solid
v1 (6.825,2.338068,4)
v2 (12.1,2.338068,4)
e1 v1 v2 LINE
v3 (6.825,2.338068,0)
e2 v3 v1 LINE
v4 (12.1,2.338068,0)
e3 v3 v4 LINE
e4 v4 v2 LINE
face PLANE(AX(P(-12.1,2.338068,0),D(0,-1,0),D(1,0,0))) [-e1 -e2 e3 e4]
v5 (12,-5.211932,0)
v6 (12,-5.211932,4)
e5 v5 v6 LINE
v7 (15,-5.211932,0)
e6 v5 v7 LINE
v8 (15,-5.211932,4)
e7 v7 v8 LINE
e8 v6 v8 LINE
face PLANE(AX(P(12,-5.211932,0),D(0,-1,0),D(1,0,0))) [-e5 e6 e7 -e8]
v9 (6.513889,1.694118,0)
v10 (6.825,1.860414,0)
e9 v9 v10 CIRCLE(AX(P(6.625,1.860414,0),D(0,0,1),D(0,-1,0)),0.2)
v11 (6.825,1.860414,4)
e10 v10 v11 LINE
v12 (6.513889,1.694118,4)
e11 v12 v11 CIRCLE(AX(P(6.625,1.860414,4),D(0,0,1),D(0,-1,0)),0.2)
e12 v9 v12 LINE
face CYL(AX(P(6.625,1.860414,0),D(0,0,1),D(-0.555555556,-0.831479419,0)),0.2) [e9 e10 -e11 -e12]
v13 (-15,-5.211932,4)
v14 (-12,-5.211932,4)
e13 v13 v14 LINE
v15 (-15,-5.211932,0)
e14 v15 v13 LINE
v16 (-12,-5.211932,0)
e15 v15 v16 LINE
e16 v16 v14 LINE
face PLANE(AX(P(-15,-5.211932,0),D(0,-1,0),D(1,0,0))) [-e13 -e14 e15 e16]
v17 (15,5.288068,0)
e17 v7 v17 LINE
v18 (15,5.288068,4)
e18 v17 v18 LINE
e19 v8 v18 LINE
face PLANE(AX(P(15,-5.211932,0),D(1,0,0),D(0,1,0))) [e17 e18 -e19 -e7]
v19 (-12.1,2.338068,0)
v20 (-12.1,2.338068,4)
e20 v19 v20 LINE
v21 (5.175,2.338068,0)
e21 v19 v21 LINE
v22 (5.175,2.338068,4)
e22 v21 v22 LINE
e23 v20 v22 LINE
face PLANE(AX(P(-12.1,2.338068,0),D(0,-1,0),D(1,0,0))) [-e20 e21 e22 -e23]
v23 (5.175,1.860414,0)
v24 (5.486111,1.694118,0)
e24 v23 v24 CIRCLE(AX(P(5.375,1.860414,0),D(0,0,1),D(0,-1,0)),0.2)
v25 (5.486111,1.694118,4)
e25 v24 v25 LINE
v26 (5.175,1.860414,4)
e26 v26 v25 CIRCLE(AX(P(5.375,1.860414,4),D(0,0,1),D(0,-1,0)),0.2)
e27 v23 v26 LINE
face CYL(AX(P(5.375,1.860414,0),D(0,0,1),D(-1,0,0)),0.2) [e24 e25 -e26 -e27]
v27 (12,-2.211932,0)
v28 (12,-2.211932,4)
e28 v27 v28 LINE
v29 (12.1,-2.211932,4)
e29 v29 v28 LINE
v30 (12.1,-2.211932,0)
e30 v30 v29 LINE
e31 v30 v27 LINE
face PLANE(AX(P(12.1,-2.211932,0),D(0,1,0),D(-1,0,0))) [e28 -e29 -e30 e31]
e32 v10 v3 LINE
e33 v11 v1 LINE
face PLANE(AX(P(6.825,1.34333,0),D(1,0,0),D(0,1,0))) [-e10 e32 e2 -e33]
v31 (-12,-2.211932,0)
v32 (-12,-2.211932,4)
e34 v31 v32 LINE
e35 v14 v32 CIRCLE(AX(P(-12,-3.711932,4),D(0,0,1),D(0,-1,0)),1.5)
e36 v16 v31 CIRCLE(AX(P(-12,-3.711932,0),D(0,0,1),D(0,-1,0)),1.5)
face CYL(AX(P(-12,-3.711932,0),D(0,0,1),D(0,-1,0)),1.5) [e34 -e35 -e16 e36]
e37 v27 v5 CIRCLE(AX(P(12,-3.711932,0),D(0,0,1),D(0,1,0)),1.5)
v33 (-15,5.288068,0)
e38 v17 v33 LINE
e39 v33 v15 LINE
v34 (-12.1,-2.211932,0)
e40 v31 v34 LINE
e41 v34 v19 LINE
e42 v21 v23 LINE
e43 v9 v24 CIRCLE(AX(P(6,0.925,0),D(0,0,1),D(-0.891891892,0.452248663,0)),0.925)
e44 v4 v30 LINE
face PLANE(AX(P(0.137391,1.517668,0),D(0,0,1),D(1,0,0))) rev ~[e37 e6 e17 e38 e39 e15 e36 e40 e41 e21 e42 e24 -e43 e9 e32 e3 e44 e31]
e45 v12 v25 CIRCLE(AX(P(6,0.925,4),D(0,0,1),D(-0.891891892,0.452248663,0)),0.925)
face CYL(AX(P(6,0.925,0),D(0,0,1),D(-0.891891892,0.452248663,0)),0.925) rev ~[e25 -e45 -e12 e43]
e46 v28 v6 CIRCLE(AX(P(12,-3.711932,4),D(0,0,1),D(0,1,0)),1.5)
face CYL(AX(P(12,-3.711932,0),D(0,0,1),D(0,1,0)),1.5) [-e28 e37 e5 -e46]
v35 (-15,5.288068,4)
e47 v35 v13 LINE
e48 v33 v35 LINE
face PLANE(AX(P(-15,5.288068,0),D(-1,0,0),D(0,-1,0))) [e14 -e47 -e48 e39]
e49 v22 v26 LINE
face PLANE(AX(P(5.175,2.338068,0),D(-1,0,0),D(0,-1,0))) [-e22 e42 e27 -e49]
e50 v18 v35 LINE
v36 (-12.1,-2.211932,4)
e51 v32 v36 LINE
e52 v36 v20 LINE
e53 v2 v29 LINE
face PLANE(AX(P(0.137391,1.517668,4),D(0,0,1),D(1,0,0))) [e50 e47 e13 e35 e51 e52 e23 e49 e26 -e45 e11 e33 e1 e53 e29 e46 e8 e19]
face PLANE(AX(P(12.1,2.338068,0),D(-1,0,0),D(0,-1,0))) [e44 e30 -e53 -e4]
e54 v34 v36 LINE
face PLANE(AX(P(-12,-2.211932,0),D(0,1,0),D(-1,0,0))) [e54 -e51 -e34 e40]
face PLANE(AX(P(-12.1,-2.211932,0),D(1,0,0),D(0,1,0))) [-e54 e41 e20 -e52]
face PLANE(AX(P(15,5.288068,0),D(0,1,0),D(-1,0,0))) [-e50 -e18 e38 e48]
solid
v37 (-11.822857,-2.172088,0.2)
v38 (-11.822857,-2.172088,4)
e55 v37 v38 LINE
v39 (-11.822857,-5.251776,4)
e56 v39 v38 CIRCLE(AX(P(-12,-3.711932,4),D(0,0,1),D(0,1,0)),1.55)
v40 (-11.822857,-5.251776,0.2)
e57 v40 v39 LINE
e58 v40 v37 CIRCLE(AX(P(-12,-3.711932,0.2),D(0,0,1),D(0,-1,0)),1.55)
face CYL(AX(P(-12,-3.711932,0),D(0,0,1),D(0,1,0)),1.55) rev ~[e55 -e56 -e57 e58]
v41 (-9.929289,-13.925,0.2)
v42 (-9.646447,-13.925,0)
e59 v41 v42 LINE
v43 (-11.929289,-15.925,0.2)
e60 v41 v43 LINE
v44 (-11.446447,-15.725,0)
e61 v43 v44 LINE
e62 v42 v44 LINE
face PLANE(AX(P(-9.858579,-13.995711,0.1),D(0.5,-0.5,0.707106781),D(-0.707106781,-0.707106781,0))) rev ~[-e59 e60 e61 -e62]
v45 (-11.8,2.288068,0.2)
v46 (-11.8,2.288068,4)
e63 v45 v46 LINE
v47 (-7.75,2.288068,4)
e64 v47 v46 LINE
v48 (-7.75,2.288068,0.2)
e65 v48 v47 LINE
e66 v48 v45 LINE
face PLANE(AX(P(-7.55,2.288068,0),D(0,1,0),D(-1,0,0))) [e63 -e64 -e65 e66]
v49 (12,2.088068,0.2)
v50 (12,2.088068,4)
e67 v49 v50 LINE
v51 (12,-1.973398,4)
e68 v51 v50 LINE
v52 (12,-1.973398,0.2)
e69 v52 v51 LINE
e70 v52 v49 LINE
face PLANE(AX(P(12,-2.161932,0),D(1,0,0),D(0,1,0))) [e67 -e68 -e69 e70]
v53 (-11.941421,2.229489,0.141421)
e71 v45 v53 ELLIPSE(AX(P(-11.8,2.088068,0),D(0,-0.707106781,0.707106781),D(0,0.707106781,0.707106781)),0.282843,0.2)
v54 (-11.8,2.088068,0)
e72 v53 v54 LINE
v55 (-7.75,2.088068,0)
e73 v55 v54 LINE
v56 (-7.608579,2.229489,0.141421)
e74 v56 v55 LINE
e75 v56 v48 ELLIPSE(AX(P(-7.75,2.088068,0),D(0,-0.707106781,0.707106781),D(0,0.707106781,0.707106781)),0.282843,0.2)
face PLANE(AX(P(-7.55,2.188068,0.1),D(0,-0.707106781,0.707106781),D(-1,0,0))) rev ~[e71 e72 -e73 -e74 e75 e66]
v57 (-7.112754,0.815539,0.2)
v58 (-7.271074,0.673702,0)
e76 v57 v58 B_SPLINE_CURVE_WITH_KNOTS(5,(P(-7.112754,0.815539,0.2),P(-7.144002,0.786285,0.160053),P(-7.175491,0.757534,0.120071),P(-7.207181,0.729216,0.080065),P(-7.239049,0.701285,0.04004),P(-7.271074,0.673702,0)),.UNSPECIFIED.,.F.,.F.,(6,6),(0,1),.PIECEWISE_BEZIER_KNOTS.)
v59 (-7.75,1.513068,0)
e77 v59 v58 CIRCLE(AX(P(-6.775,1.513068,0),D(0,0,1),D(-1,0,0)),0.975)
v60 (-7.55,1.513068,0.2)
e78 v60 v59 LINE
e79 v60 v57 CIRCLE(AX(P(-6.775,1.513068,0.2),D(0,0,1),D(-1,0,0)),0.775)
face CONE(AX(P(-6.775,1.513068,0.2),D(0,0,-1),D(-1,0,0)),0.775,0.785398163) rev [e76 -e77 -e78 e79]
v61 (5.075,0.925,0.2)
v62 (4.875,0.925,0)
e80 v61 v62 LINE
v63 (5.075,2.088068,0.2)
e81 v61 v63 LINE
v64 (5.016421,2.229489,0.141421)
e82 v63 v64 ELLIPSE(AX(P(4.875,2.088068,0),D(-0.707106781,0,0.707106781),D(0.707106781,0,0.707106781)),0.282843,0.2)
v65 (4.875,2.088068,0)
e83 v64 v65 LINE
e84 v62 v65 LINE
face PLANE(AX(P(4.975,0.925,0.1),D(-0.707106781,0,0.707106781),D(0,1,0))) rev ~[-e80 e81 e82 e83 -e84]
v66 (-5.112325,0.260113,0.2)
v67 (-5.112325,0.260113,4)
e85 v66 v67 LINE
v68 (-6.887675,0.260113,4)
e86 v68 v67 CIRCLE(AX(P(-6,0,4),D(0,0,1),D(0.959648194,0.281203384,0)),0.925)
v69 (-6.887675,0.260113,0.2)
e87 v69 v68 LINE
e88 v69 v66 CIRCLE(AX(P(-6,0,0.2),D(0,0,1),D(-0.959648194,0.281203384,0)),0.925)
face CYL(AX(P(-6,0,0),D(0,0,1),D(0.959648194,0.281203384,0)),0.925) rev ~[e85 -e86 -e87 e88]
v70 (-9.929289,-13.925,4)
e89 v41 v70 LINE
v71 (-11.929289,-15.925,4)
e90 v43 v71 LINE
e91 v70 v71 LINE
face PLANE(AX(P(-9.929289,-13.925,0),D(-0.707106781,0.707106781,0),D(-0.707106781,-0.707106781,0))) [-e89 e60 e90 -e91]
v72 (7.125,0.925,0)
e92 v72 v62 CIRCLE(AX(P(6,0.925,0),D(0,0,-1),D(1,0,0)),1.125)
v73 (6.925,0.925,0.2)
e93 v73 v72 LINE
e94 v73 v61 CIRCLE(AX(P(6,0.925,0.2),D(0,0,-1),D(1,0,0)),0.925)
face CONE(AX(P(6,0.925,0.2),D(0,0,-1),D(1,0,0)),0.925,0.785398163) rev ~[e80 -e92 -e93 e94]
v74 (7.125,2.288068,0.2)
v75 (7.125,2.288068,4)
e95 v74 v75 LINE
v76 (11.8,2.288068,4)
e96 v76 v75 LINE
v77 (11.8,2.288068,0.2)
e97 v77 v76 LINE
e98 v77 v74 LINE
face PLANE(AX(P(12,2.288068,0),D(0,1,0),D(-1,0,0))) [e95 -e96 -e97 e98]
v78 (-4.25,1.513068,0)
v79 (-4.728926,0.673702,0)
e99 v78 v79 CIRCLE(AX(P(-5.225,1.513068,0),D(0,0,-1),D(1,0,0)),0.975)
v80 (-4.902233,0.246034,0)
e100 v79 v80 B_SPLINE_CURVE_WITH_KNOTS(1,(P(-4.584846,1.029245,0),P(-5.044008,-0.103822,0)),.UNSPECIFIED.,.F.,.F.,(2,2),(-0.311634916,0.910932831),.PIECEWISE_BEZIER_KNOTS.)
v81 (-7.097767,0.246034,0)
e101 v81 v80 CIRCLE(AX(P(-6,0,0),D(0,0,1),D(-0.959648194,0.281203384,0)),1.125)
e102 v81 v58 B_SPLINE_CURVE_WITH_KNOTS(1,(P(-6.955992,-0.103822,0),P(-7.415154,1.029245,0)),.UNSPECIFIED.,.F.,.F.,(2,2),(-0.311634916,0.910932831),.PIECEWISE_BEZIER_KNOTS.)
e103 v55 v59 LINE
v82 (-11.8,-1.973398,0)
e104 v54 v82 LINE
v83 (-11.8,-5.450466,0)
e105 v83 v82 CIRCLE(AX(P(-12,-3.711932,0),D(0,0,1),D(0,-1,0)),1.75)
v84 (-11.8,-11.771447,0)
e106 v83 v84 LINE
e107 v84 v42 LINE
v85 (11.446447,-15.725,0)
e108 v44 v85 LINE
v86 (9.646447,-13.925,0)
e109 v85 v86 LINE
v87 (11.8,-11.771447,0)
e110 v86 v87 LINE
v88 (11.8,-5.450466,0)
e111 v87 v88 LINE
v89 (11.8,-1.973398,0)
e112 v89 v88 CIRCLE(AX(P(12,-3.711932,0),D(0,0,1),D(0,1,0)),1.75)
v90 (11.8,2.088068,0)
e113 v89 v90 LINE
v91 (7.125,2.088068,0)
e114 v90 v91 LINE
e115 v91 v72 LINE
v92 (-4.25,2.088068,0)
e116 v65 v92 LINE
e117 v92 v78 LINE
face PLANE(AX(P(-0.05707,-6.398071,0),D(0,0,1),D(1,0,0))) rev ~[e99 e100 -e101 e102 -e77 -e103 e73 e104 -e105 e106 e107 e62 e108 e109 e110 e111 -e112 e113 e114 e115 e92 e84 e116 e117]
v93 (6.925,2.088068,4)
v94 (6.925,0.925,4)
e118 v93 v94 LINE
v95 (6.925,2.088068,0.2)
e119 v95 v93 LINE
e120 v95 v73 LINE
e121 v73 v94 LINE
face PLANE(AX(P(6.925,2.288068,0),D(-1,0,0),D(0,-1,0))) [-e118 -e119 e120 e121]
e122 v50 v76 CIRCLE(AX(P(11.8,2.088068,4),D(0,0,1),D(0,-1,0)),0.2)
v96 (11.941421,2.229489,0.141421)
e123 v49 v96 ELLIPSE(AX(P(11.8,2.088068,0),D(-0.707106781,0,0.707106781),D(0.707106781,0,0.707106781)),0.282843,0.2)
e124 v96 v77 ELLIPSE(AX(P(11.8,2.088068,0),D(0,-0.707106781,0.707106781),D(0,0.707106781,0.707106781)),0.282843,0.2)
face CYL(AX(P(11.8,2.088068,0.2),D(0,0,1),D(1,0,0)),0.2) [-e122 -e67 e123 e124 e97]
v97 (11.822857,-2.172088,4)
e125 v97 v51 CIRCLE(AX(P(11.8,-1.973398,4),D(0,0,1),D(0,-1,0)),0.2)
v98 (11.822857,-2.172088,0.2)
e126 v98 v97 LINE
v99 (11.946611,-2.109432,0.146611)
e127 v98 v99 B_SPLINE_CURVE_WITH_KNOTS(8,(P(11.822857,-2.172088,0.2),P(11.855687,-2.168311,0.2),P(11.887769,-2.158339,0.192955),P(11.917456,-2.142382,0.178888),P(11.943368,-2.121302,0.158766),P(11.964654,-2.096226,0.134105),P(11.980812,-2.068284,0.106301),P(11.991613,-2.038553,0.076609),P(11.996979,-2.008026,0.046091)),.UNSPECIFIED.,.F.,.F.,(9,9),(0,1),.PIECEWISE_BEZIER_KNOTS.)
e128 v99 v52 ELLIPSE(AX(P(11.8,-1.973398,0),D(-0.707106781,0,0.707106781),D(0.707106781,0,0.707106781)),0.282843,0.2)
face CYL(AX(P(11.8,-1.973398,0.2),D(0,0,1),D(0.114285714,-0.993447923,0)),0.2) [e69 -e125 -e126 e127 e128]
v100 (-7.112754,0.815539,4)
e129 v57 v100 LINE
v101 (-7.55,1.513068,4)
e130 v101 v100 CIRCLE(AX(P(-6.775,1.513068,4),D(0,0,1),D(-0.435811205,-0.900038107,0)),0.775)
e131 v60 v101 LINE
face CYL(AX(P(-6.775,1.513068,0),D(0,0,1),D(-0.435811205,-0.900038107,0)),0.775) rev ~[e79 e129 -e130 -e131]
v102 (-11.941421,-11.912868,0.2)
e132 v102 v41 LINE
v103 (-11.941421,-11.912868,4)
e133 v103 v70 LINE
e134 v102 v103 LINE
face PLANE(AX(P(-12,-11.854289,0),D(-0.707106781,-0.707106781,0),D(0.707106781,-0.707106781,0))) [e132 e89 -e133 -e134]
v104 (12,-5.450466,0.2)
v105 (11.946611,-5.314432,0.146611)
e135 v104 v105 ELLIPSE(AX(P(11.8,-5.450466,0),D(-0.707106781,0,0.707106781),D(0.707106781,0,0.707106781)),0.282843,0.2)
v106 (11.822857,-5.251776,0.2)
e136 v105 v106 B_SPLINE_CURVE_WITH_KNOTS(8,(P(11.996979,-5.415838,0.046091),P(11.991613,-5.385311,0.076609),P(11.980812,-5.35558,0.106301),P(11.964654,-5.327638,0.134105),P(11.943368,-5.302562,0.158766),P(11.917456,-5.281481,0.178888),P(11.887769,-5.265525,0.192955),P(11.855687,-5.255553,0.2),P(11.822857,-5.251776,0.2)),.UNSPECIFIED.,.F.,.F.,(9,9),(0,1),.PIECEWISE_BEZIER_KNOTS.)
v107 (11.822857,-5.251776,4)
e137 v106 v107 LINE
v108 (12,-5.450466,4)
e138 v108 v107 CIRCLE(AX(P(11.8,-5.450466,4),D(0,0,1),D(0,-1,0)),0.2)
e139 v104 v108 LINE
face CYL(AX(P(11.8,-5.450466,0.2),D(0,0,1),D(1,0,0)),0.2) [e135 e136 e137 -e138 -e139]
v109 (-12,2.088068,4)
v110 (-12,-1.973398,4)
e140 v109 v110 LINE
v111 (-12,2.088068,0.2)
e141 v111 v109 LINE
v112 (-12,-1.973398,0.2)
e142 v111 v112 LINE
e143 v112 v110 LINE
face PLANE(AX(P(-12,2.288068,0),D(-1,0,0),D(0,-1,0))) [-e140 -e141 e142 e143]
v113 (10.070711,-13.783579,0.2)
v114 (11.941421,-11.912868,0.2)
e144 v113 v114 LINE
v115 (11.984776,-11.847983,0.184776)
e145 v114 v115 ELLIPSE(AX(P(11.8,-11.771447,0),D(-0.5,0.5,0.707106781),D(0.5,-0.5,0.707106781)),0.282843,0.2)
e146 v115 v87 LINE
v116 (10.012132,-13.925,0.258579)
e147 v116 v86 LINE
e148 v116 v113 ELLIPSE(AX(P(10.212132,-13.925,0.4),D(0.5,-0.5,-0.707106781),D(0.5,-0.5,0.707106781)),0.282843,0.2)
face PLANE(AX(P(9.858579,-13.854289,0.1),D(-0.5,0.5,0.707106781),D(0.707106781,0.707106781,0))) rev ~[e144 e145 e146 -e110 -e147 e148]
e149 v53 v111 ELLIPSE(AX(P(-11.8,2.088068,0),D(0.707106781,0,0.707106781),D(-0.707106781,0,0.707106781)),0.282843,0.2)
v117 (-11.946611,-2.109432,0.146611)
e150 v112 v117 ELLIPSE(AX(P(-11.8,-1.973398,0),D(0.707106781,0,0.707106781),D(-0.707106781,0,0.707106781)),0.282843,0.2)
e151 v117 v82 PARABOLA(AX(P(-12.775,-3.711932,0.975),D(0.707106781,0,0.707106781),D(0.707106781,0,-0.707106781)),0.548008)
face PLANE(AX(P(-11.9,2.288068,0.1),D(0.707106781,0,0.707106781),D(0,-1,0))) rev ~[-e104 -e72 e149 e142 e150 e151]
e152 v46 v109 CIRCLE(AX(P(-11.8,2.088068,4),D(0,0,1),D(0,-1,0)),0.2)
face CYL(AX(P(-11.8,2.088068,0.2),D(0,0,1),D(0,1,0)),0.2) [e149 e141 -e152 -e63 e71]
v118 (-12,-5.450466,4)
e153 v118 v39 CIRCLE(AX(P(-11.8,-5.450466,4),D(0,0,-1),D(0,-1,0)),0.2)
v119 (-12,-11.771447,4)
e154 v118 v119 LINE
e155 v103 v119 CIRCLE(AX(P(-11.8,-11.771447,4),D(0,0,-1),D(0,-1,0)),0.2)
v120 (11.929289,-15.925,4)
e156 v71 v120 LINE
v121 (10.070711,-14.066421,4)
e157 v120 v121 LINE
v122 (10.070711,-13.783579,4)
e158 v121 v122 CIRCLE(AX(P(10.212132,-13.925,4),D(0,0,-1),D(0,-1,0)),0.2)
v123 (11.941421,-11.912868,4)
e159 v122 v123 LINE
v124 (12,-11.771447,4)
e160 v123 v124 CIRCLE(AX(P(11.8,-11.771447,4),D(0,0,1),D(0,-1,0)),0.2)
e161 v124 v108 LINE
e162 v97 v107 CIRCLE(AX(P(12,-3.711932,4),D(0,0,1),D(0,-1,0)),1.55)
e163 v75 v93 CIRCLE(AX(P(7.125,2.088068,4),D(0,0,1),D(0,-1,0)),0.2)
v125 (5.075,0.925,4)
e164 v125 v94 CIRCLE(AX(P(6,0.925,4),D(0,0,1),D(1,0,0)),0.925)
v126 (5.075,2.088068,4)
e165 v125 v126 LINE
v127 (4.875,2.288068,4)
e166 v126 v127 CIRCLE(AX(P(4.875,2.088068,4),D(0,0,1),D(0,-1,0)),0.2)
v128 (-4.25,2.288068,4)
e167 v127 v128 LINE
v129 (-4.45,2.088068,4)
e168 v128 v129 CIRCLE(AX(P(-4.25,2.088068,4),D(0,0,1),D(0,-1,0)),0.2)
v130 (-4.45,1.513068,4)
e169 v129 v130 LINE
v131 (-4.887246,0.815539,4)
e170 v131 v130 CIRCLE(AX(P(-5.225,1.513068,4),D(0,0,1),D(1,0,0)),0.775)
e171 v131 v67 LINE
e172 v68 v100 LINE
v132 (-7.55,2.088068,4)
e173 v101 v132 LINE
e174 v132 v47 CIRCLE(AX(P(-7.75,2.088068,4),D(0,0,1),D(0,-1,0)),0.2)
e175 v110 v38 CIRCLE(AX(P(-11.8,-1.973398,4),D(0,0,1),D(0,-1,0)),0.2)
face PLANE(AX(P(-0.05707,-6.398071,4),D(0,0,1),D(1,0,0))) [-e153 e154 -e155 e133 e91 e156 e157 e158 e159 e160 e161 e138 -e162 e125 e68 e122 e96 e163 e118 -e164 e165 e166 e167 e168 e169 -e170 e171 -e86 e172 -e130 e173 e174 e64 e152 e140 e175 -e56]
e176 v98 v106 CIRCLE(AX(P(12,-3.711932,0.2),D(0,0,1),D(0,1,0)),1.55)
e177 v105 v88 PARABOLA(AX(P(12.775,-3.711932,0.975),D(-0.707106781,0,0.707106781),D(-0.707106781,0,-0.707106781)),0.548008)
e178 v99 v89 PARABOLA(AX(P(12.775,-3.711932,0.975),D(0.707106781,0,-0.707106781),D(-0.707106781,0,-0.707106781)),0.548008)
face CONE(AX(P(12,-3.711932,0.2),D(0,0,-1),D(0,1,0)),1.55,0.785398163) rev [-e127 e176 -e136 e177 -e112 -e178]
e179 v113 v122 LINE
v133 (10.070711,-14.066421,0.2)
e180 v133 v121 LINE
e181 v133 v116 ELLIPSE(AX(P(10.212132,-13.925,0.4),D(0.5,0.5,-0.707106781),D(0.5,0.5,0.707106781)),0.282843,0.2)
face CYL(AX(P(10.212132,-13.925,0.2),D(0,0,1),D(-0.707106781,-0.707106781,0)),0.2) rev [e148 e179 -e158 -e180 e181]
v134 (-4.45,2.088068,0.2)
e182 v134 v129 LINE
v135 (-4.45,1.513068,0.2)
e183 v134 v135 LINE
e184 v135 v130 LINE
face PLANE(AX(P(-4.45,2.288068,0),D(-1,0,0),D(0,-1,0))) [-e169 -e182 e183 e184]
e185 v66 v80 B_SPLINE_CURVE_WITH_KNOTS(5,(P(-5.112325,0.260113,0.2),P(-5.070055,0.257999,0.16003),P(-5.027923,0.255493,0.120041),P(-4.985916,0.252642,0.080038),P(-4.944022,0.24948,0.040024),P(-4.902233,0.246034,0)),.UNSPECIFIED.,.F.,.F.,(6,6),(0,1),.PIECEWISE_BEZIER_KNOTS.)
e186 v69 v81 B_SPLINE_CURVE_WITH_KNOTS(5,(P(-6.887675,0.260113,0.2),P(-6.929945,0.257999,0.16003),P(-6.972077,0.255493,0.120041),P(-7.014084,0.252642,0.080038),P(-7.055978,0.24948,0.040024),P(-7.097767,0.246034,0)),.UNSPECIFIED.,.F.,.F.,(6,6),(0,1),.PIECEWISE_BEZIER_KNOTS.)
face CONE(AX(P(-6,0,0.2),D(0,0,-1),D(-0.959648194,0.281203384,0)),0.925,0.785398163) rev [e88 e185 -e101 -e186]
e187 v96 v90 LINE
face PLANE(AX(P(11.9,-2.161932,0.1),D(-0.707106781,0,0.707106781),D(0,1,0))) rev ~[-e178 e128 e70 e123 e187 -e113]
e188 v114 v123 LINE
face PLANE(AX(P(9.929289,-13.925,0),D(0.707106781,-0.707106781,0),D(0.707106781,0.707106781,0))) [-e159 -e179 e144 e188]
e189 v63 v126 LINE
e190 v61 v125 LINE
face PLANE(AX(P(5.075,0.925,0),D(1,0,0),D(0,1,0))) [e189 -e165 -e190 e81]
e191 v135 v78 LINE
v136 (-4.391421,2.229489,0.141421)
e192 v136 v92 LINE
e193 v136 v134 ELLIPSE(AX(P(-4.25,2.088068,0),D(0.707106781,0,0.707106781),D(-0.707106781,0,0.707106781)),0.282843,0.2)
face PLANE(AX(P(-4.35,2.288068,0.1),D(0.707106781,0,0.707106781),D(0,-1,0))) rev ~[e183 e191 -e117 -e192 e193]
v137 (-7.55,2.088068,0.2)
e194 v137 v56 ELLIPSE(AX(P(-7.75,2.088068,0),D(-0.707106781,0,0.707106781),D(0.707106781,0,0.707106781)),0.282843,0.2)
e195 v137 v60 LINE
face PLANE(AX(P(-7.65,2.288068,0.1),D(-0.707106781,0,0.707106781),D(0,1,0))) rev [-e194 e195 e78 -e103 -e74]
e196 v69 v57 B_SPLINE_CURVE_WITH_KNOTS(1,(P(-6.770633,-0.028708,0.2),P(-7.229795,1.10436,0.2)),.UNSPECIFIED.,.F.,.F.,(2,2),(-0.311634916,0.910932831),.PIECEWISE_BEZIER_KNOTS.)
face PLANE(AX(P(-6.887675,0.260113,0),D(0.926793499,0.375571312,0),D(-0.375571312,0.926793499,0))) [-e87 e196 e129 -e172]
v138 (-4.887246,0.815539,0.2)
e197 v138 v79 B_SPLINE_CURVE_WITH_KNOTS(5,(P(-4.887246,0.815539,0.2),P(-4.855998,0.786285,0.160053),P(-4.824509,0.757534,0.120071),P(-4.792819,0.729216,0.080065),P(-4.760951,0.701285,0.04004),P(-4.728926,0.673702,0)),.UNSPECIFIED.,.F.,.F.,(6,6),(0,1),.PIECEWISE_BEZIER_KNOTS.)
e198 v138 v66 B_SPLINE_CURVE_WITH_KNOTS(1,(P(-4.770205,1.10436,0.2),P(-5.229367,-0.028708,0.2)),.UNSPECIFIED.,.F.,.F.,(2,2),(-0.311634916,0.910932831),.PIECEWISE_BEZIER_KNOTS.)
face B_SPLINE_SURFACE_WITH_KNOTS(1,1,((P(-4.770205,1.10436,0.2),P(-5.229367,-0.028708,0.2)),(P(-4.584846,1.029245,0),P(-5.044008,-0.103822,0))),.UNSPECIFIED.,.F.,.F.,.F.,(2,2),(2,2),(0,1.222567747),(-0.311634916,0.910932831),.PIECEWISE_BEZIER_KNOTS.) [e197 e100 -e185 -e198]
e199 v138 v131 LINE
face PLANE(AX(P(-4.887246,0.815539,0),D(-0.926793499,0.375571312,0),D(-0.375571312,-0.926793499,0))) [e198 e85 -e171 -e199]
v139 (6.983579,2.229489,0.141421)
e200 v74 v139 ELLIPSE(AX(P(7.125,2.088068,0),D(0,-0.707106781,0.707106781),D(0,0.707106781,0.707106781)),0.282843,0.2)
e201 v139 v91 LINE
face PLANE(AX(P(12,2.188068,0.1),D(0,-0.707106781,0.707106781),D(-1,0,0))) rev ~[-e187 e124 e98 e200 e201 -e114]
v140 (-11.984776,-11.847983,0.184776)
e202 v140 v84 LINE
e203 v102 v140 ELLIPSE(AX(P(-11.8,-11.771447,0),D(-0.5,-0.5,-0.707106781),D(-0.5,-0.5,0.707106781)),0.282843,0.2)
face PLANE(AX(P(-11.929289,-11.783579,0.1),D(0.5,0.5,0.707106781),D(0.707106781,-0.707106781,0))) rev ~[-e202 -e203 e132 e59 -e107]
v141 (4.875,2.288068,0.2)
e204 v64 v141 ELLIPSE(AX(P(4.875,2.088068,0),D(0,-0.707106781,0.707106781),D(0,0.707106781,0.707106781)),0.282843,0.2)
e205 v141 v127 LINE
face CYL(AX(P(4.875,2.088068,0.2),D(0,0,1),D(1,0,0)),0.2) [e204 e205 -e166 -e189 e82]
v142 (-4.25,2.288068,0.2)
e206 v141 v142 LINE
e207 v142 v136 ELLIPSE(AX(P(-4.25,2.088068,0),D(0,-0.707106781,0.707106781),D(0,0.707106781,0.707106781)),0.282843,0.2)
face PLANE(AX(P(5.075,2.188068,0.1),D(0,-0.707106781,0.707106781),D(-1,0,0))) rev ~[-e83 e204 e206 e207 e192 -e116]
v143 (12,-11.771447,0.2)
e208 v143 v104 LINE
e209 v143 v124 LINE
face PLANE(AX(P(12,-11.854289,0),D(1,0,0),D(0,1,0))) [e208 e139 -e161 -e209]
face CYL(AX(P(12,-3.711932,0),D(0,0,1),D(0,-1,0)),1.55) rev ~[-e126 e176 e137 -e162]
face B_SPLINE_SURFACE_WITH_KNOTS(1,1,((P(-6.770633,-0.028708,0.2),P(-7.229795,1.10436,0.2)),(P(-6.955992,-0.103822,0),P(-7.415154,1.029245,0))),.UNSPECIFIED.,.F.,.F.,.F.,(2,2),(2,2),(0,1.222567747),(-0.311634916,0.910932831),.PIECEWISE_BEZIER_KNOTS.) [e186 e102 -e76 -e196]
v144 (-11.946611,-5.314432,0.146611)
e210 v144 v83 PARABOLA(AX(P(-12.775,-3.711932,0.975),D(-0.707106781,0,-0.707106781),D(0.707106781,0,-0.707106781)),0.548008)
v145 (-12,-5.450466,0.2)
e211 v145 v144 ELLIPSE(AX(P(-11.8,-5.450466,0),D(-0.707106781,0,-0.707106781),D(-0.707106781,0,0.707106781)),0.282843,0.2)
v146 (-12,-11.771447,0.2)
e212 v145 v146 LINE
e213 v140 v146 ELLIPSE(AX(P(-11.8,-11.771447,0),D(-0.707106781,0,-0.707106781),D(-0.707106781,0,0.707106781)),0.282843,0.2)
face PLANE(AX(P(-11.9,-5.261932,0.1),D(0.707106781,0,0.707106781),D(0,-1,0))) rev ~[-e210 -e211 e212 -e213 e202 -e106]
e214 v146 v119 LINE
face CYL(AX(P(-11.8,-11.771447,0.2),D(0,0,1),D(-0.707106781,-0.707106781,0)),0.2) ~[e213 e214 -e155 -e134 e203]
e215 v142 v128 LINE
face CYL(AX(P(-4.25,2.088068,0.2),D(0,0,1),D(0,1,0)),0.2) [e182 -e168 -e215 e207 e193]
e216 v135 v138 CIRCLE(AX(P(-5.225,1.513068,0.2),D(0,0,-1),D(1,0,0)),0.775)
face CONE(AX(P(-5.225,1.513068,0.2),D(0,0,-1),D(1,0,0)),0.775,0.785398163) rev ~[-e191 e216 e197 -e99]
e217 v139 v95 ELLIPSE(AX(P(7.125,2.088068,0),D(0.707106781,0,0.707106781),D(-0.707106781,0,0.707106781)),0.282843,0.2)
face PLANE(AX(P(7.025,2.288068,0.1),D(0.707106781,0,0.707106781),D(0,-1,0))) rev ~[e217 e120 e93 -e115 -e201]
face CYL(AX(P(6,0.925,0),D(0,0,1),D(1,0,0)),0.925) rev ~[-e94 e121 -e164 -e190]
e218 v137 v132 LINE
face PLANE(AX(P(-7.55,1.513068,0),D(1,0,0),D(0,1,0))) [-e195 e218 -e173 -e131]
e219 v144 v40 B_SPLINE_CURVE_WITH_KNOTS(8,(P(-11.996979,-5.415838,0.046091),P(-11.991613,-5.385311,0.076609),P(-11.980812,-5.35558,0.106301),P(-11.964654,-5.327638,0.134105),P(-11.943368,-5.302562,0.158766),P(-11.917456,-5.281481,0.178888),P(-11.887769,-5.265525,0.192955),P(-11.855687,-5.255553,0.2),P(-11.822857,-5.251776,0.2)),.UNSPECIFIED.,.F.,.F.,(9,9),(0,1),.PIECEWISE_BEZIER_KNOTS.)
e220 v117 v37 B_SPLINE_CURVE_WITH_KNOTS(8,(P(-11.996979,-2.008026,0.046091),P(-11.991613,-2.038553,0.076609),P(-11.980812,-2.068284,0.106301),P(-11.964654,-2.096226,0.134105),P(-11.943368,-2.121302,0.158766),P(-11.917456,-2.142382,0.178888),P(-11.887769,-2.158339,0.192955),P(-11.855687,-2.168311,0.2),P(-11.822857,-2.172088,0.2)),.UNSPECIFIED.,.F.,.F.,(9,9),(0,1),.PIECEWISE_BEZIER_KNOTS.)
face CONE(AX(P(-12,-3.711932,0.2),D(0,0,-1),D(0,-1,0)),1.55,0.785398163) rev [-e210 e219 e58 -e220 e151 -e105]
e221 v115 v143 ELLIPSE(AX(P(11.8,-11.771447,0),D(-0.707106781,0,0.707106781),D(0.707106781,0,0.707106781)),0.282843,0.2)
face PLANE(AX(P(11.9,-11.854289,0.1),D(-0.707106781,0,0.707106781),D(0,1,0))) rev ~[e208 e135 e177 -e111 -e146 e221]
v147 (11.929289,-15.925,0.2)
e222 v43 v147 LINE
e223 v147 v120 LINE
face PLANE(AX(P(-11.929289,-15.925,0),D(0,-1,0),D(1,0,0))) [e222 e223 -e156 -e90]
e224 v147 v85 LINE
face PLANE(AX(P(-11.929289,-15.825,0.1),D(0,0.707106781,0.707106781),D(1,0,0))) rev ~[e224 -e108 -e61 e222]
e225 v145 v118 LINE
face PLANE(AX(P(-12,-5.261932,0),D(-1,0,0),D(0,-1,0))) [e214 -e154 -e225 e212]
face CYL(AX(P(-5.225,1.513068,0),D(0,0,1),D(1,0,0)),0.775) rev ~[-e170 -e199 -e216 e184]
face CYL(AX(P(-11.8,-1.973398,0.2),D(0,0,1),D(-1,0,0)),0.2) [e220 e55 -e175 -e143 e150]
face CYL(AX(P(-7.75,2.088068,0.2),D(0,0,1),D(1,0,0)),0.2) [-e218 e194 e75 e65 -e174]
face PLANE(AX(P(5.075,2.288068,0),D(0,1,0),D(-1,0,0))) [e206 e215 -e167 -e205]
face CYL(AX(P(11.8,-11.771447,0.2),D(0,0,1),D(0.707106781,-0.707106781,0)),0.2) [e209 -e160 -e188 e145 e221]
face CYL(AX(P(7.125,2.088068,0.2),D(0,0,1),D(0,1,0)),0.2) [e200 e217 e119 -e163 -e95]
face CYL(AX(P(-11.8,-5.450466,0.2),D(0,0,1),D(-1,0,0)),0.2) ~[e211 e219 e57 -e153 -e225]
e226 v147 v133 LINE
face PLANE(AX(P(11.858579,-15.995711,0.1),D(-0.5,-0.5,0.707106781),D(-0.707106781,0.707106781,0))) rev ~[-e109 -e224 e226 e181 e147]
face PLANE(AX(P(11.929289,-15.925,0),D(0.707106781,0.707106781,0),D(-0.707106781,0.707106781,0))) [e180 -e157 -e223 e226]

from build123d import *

# Parameters (mm, degrees)
F3_SIZE = 0.2
F6_R    = 0.2
F6_2_R  = 0.2


with BuildPart() as f2:
    # F2: sweep along a path in F1
    with BuildLine(Plane.XZ) as f2_path:
        Line((0, 0), (0, 4))
    # F0 (on Top) → F2 (sweep)
    with BuildSketch(Plane.XY):
        with BuildLine():
            Line((-9.9292893219, -13.925), (-11.9292893219, -15.925))
            Line((-11.9292893219, -15.925), (11.9292893219, -15.925))
            Line((11.9292893219, -15.925), (9.9292893219, -13.925))
            Line((9.9292893219, -13.925), (12, -11.8542893219))
            Line((12, -11.8542893219), (12, -5.2619319249))
            ThreePointArc((12, -5.2619319249), (10.45, -3.7119319249), (12, -2.1619319249))
            Line((12, -2.1619319249), (12, 2.2880680751))
            Line((12, 2.2880680751), (6.925, 2.2880680751))
            Line((6.925, 2.2880680751), (6.925, 0.925))
            ThreePointArc((6.925, 0.925), (6, 0), (5.075, 0.925))
            Line((5.075, 0.925), (5.075, 2.2880680751))
            Line((5.075, 2.2880680751), (-4.45, 2.2880680751))
            Line((-4.45, 2.2880680751), (-4.45, 1.5130680751))
            ThreePointArc((-4.45, 1.5130680751), (-4.5683478452, 1.1014457391), (-4.8872463162, 0.8155385424))
            Line((-4.8872463162, 0.8155385424), (-5.1123254204, 0.2601131305))
            ThreePointArc((-5.1123254204, 0.2601131305), (-6, -0.925), (-6.8876745796, 0.2601131305))
            Line((-6.8876745796, 0.2601131305), (-7.1127536838, 0.8155385424))
            ThreePointArc((-7.1127536838, 0.8155385424), (-7.4316521548, 1.1014457391), (-7.55, 1.5130680751))
            Line((-7.55, 1.5130680751), (-7.55, 2.2880680751))
            Line((-7.55, 2.2880680751), (-12, 2.2880680751))
            Line((-12, 2.2880680751), (-12, -2.1619319249))
            ThreePointArc((-12, -2.1619319249), (-10.45, -3.7119319249), (-12, -5.2619319249))
            Line((-12, -5.2619319249), (-12, -11.8542893219))
            Line((-12, -11.8542893219), (-9.9292893219, -13.925))
        make_face()
    sweep(path=f2_path.line)

    # F3
    f3_edges = [f2.edges().sort_by_distance(p)[0] for p in [
        (-10.929289, -14.925, 0),
        (0, -15.925, 0),
        (10.929289, -14.925, 0),
        (10.964645, -12.889645, 0),
        (12, -8.558111, 0),
        (10.45, -3.711932, 0),
        (12, 0.063068, 0),
        (9.4625, 2.288068, 0),
        (6.925, 1.606534, 0),
        (6, 0, 0),
        (5.075, 1.606534, 0),
        (0.3125, 2.288068, 0),
        (-4.45, 1.900568, 0),
        (-4.568348, 1.101446, 0),
        (-4.999786, 0.537826, 0),
        (-6, -0.925, 0),
        (-7.000214, 0.537826, 0),
        (-7.431652, 1.101446, 0),
        (-7.55, 1.900568, 0),
        (-9.775, 2.288068, 0),
        (-12, 0.063068, 0),
        (-10.45, -3.711932, 0),
        (-12, -8.558111, 0),
        (-10.964645, -12.889645, 0),
    ]]
    chamfer(f3_edges, length=F3_SIZE)

    # F6
    f6_edges = [f2.edges().sort_by_distance(p)[0] for p in [
        (-12, -11.854289, 2.1),
        (12, 2.288068, 2.1),
        (-7.55, 2.288068, 2.1),
        (-4.45, 2.288068, 2.1),
        (5.075, 2.288068, 2.1),
        (6.925, 2.288068, 2.1),
        (-12, -2.161932, 2.1),
        (12, -5.261932, 2.1),
        (-12, -5.261932, 2.1),
        (9.929289, -13.925, 2.1),
        (12, -11.854289, 2.1),
        (12, -2.161932, 2.1),
        (-12, 2.288068, 2.1),
    ]]
    fillet(f6_edges, radius=F6_R)


with BuildPart() as f5:
    # F5: sweep along a path in F1
    with BuildLine(Plane.XZ) as f5_path:
        Line((0, 0), (0, 4))
    # F4 (on Top) → F5 (sweep)
    with BuildSketch(Plane.XY):
        with BuildLine():
            ThreePointArc((-12, -5.2119319249), (-10.5, -3.7119319249), (-12, -2.2119319249))
            Line((-12, -2.2119319249), (-12.1, -2.2119319249))
            Line((-12.1, -2.2119319249), (-12.1, 2.3380680751))
            Line((-12.1, 2.3380680751), (0, 2.3380680751))
            Line((0, 2.3380680751), (5.175, 2.3380680751))
            Line((5.175, 2.3380680751), (6.825, 2.3380680751))
            Line((6.825, 2.3380680751), (12.1, 2.3380680751))
            Line((12.1, 2.3380680751), (12.1, -2.2119319249))
            Line((12.1, -2.2119319249), (12, -2.2119319249))
            ThreePointArc((12, -2.2119319249), (10.5, -3.7119319249), (12, -5.2119319249))
            Line((12, -5.2119319249), (15, -5.2119319249))
            Line((15, -5.2119319249), (15, 5.2880680751))
            Line((15, 5.2880680751), (0, 5.2880680751))
            Line((0, 5.2880680751), (-15, 5.2880680751))
            Line((-15, 5.2880680751), (-15, -5.2119319249))
            Line((-15, -5.2119319249), (-12, -5.2119319249))
        make_face()
        with BuildLine():
            Line((6.825, 2.3380680751), (5.175, 2.3380680751))
            Line((5.175, 2.3380680751), (5.175, 1.3433300133))
            ThreePointArc((5.175, 1.3433300133), (6, 1.85), (6.825, 1.3433300133))
            Line((6.825, 1.3433300133), (6.825, 2.3380680751))
        make_face()
    sweep(path=f5_path.line)

    # F6#2
    f6_2_edges = [f5.edges().sort_by_distance(p)[0] for p in [
        (5.175, 1.34333, 2),
        (6.825, 1.34333, 2),
    ]]
    fillet(f6_2_edges, radius=F6_2_R)


solid = Compound([f2.part, f5.part])
